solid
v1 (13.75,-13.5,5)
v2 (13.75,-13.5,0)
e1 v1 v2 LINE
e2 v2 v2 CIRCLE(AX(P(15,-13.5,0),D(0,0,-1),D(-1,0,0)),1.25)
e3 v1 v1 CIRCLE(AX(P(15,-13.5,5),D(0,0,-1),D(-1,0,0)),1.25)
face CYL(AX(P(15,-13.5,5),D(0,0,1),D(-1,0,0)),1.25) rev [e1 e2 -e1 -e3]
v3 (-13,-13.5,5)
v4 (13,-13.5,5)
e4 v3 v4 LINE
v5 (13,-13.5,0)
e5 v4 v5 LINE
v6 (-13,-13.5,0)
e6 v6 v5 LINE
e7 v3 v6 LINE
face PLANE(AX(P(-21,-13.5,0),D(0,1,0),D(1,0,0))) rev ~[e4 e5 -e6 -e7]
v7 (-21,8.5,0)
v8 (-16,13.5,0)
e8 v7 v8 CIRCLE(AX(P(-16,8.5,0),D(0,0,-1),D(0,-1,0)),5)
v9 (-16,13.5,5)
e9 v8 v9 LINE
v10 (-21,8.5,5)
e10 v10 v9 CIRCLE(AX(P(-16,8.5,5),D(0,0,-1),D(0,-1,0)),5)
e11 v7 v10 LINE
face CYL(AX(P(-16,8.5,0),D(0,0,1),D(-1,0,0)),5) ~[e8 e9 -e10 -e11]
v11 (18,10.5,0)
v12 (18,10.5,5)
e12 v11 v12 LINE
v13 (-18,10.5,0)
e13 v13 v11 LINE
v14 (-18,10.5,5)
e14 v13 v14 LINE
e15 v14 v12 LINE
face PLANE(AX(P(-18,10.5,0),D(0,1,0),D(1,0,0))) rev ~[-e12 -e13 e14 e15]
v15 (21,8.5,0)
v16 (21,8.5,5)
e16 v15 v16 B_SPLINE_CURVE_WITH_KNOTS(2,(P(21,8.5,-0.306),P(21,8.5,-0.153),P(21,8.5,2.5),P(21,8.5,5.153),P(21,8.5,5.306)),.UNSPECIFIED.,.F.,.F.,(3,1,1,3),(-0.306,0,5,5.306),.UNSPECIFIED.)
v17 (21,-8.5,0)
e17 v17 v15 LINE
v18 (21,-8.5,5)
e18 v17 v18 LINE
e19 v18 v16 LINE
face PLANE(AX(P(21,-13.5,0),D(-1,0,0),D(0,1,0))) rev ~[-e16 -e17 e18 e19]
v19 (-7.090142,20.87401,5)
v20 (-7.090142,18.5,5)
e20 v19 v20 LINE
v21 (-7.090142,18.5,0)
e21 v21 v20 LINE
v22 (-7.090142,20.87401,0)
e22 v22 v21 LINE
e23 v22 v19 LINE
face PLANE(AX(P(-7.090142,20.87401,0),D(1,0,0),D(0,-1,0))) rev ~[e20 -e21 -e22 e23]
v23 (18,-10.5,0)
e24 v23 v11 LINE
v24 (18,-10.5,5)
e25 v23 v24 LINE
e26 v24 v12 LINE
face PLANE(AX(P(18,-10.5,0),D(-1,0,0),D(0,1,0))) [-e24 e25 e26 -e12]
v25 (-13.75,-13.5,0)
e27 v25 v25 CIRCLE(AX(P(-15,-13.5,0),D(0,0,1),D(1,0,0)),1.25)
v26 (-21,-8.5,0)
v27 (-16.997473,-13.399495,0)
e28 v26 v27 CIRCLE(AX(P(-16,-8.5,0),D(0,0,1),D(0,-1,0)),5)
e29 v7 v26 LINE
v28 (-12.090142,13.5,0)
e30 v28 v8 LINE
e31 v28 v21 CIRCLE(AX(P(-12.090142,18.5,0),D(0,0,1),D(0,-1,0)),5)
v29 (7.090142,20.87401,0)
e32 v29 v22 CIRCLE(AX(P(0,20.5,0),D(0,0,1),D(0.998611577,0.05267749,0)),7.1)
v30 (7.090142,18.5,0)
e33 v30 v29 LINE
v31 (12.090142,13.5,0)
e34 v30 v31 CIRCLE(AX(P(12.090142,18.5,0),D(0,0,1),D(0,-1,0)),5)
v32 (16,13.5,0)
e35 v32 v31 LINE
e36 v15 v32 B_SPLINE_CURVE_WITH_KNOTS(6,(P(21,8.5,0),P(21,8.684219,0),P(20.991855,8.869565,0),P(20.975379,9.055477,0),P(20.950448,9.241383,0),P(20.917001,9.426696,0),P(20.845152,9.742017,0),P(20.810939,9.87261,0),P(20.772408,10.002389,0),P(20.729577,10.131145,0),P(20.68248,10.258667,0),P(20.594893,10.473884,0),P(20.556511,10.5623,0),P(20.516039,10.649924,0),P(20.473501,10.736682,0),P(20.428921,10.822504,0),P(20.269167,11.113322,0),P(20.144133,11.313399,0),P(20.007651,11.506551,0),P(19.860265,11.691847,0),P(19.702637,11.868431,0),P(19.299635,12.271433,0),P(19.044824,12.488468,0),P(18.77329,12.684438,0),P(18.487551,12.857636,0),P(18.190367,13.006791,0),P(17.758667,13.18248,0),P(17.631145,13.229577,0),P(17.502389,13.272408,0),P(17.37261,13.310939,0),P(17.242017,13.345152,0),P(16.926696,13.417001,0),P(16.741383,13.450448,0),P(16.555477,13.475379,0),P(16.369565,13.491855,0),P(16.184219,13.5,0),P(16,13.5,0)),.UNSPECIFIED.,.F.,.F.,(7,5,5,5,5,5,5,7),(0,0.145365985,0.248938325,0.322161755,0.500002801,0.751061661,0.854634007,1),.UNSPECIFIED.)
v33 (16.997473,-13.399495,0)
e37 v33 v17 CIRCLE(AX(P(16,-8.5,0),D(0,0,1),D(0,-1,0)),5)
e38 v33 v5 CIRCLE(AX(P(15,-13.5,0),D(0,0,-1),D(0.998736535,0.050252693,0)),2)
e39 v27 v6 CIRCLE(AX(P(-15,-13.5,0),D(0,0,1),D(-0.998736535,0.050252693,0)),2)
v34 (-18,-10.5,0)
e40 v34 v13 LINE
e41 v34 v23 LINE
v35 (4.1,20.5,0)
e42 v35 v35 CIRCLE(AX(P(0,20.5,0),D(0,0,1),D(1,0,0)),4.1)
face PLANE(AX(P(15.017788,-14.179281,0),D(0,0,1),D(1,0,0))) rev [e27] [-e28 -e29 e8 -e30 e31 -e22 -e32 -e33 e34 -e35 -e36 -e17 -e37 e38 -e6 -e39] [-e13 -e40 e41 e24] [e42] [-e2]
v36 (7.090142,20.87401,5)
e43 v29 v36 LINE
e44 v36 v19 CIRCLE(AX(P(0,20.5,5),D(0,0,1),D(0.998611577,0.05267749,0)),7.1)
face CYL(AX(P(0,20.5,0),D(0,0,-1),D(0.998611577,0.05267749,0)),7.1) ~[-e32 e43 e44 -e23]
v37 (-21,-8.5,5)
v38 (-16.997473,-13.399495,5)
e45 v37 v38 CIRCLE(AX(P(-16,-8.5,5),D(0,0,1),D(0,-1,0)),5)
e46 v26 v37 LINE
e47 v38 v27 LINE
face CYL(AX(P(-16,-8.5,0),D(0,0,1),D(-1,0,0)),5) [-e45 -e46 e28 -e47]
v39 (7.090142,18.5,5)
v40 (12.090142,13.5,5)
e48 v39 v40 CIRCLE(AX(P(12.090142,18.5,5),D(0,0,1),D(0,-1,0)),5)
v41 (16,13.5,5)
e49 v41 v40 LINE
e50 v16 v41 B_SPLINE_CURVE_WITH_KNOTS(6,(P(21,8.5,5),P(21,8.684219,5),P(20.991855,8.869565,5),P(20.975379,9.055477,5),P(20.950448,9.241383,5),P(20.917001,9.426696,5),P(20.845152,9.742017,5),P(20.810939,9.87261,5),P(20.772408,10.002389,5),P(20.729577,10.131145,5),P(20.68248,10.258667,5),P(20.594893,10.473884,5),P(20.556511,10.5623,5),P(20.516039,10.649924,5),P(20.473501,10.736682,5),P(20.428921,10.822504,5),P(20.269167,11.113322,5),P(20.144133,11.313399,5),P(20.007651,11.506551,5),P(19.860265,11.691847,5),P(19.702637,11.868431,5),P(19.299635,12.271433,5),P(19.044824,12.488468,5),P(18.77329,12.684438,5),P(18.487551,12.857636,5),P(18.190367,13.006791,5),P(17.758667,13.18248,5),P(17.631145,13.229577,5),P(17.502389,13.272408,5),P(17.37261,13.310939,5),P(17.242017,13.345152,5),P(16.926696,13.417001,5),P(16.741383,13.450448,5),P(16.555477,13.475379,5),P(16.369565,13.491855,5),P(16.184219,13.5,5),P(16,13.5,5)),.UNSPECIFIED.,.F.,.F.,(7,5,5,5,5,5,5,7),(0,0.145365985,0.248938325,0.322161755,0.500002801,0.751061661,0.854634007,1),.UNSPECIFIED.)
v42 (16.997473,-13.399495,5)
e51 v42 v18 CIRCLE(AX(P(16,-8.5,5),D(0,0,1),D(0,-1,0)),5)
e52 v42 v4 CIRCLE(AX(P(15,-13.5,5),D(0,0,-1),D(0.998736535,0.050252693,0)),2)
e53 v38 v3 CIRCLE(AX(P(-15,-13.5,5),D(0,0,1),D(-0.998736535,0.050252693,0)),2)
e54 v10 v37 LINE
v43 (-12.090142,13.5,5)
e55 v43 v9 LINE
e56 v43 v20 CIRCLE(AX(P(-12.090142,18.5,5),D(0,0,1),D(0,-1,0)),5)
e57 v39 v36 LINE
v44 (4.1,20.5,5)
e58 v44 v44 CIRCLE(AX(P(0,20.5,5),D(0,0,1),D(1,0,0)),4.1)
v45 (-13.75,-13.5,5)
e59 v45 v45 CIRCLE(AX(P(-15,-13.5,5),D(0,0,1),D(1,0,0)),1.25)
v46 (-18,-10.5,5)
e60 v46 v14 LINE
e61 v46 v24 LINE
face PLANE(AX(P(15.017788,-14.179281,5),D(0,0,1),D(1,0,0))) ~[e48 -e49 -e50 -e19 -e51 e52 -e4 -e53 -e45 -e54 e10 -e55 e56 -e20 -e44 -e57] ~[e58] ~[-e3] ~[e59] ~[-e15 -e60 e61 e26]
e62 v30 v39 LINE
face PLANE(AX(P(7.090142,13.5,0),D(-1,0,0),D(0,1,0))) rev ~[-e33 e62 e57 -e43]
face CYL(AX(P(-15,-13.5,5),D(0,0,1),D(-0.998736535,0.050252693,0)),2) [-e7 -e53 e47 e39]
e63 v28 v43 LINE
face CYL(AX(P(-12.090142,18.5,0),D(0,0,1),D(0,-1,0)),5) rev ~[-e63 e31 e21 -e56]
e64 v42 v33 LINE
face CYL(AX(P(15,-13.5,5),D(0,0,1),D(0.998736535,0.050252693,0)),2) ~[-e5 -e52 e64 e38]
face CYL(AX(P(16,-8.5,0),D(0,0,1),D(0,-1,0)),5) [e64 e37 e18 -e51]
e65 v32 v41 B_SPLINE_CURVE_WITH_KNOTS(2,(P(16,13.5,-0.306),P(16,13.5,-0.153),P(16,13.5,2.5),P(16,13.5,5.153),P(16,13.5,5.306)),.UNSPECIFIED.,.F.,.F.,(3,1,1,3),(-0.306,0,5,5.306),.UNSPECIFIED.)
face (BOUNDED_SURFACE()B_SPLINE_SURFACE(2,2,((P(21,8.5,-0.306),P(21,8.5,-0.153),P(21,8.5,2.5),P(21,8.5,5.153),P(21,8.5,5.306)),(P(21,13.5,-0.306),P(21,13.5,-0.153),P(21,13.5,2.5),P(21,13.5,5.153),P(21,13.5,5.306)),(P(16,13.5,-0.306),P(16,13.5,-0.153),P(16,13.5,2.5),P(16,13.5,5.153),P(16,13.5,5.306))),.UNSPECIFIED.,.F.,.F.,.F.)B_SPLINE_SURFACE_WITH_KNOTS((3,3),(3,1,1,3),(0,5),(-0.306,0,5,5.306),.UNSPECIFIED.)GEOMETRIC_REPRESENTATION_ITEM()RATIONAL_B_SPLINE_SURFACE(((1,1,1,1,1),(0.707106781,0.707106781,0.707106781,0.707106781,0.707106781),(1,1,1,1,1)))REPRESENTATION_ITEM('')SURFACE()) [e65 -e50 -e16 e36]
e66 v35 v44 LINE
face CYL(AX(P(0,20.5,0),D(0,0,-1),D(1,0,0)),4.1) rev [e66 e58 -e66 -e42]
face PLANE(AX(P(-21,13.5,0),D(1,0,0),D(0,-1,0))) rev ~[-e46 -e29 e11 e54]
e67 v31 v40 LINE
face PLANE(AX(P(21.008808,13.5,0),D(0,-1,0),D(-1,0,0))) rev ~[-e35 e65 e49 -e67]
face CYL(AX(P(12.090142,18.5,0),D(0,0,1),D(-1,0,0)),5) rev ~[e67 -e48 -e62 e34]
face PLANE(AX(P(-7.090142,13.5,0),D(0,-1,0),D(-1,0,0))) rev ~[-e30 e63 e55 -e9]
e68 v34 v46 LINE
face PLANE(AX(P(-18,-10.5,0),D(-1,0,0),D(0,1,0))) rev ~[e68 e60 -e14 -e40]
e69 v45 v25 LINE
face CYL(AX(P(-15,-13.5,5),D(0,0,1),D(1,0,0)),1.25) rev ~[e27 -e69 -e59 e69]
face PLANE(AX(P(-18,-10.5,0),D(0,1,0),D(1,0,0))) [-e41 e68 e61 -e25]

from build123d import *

# Parameters (mm, degrees)
F0_W     = 36
F0_H     = 21
F0_R     = 4.1
F1_DEPTH = 5
F2_R     = 5
F4_DEPTH = 5
F5_R     = 1.25
F6_DEPTH = 5


# Not quite as in the source:
# - a pattern or mirror of a feature is missing from the dataset's text; its kind, count and spacing are read off the source's solid


with BuildPart() as f1:
    # F0 (on Top) → F1 (new body)
    with BuildSketch(Plane.XY):
        with BuildLine():
            Line((-21, 13.5), (-21, 10.5))
            Line((-21, 10.5), (-21, -13.5))
            Line((-21, -13.5), (21, -13.5))
            Line((21, -13.5), (21, 10.5))
            Line((21, 10.5), (21.0088081658, 13.5))
            Line((21.0088081658, 13.5), (7.0901421979, 13.5))
            Line((7.0901421979, 13.5), (7.0901421979, 20.8740101776))
            ThreePointArc((7.0901421979, 20.8740101776), (0, 27.6), (-7.0901421979, 20.8740101776))
            Line((-7.0901421979, 20.8740101776), (-7.0901421979, 13.5))
            Line((-7.0901421979, 13.5), (-21, 13.5))
        make_face()
        Rectangle(F0_W, F0_H, mode=Mode.SUBTRACT)
        with Locations((0, 20.5)):
            Circle(F0_R, mode=Mode.SUBTRACT)
    extrude(amount=F1_DEPTH)

    # F2
    f2_edges = [f1.edges().sort_by_distance(p)[0] for p in [
        (-7.090142, 13.5, 2.5),
        (7.090142, 13.5, 2.5),
        (21.008808, 13.5, 2.5),
        (-21, 13.5, 2.5),
        (-21, -13.5, 2.5),
        (21, -13.5, 2.5),
    ]]
    fillet(f2_edges, radius=F2_R)

    # F3 (on face) → F4 (join, through all)
    with BuildSketch(Plane.XY.offset(5)):
        with BuildLine():
            ThreePointArc((-16.9974730705, -13.3994946141), (-15.0502685736, -15.4993681678), (-13, -13.5))
            Line((-13, -13.5), (-16, -13.5))
            ThreePointArc((-16, -13.5), (-16.5012618724, -13.4748102009), (-16.9974730705, -13.3994946141))
        make_face()
    f4 = extrude(amount=-F4_DEPTH)

    # F4_copies: F4 across plane
    add(f4.mirror(Plane(origin=(0, 0, 0), x_dir=(0, 0, 1), z_dir=(1, 0, 0))))

    # F5 (on face) → F6 (cut, through all)
    with BuildSketch(Plane.XY.offset(5)):
        with Locations((-15, -13.5)):
            Circle(F5_R)
    f6 = extrude(amount=-F6_DEPTH, mode=Mode.SUBTRACT)

    # F6_copies: F6 across plane
    add(f6.mirror(Plane(origin=(0, 0, 0), x_dir=(0, 0, 1), z_dir=(1, 0, 0))), mode=Mode.SUBTRACT)


solid = f1.part
